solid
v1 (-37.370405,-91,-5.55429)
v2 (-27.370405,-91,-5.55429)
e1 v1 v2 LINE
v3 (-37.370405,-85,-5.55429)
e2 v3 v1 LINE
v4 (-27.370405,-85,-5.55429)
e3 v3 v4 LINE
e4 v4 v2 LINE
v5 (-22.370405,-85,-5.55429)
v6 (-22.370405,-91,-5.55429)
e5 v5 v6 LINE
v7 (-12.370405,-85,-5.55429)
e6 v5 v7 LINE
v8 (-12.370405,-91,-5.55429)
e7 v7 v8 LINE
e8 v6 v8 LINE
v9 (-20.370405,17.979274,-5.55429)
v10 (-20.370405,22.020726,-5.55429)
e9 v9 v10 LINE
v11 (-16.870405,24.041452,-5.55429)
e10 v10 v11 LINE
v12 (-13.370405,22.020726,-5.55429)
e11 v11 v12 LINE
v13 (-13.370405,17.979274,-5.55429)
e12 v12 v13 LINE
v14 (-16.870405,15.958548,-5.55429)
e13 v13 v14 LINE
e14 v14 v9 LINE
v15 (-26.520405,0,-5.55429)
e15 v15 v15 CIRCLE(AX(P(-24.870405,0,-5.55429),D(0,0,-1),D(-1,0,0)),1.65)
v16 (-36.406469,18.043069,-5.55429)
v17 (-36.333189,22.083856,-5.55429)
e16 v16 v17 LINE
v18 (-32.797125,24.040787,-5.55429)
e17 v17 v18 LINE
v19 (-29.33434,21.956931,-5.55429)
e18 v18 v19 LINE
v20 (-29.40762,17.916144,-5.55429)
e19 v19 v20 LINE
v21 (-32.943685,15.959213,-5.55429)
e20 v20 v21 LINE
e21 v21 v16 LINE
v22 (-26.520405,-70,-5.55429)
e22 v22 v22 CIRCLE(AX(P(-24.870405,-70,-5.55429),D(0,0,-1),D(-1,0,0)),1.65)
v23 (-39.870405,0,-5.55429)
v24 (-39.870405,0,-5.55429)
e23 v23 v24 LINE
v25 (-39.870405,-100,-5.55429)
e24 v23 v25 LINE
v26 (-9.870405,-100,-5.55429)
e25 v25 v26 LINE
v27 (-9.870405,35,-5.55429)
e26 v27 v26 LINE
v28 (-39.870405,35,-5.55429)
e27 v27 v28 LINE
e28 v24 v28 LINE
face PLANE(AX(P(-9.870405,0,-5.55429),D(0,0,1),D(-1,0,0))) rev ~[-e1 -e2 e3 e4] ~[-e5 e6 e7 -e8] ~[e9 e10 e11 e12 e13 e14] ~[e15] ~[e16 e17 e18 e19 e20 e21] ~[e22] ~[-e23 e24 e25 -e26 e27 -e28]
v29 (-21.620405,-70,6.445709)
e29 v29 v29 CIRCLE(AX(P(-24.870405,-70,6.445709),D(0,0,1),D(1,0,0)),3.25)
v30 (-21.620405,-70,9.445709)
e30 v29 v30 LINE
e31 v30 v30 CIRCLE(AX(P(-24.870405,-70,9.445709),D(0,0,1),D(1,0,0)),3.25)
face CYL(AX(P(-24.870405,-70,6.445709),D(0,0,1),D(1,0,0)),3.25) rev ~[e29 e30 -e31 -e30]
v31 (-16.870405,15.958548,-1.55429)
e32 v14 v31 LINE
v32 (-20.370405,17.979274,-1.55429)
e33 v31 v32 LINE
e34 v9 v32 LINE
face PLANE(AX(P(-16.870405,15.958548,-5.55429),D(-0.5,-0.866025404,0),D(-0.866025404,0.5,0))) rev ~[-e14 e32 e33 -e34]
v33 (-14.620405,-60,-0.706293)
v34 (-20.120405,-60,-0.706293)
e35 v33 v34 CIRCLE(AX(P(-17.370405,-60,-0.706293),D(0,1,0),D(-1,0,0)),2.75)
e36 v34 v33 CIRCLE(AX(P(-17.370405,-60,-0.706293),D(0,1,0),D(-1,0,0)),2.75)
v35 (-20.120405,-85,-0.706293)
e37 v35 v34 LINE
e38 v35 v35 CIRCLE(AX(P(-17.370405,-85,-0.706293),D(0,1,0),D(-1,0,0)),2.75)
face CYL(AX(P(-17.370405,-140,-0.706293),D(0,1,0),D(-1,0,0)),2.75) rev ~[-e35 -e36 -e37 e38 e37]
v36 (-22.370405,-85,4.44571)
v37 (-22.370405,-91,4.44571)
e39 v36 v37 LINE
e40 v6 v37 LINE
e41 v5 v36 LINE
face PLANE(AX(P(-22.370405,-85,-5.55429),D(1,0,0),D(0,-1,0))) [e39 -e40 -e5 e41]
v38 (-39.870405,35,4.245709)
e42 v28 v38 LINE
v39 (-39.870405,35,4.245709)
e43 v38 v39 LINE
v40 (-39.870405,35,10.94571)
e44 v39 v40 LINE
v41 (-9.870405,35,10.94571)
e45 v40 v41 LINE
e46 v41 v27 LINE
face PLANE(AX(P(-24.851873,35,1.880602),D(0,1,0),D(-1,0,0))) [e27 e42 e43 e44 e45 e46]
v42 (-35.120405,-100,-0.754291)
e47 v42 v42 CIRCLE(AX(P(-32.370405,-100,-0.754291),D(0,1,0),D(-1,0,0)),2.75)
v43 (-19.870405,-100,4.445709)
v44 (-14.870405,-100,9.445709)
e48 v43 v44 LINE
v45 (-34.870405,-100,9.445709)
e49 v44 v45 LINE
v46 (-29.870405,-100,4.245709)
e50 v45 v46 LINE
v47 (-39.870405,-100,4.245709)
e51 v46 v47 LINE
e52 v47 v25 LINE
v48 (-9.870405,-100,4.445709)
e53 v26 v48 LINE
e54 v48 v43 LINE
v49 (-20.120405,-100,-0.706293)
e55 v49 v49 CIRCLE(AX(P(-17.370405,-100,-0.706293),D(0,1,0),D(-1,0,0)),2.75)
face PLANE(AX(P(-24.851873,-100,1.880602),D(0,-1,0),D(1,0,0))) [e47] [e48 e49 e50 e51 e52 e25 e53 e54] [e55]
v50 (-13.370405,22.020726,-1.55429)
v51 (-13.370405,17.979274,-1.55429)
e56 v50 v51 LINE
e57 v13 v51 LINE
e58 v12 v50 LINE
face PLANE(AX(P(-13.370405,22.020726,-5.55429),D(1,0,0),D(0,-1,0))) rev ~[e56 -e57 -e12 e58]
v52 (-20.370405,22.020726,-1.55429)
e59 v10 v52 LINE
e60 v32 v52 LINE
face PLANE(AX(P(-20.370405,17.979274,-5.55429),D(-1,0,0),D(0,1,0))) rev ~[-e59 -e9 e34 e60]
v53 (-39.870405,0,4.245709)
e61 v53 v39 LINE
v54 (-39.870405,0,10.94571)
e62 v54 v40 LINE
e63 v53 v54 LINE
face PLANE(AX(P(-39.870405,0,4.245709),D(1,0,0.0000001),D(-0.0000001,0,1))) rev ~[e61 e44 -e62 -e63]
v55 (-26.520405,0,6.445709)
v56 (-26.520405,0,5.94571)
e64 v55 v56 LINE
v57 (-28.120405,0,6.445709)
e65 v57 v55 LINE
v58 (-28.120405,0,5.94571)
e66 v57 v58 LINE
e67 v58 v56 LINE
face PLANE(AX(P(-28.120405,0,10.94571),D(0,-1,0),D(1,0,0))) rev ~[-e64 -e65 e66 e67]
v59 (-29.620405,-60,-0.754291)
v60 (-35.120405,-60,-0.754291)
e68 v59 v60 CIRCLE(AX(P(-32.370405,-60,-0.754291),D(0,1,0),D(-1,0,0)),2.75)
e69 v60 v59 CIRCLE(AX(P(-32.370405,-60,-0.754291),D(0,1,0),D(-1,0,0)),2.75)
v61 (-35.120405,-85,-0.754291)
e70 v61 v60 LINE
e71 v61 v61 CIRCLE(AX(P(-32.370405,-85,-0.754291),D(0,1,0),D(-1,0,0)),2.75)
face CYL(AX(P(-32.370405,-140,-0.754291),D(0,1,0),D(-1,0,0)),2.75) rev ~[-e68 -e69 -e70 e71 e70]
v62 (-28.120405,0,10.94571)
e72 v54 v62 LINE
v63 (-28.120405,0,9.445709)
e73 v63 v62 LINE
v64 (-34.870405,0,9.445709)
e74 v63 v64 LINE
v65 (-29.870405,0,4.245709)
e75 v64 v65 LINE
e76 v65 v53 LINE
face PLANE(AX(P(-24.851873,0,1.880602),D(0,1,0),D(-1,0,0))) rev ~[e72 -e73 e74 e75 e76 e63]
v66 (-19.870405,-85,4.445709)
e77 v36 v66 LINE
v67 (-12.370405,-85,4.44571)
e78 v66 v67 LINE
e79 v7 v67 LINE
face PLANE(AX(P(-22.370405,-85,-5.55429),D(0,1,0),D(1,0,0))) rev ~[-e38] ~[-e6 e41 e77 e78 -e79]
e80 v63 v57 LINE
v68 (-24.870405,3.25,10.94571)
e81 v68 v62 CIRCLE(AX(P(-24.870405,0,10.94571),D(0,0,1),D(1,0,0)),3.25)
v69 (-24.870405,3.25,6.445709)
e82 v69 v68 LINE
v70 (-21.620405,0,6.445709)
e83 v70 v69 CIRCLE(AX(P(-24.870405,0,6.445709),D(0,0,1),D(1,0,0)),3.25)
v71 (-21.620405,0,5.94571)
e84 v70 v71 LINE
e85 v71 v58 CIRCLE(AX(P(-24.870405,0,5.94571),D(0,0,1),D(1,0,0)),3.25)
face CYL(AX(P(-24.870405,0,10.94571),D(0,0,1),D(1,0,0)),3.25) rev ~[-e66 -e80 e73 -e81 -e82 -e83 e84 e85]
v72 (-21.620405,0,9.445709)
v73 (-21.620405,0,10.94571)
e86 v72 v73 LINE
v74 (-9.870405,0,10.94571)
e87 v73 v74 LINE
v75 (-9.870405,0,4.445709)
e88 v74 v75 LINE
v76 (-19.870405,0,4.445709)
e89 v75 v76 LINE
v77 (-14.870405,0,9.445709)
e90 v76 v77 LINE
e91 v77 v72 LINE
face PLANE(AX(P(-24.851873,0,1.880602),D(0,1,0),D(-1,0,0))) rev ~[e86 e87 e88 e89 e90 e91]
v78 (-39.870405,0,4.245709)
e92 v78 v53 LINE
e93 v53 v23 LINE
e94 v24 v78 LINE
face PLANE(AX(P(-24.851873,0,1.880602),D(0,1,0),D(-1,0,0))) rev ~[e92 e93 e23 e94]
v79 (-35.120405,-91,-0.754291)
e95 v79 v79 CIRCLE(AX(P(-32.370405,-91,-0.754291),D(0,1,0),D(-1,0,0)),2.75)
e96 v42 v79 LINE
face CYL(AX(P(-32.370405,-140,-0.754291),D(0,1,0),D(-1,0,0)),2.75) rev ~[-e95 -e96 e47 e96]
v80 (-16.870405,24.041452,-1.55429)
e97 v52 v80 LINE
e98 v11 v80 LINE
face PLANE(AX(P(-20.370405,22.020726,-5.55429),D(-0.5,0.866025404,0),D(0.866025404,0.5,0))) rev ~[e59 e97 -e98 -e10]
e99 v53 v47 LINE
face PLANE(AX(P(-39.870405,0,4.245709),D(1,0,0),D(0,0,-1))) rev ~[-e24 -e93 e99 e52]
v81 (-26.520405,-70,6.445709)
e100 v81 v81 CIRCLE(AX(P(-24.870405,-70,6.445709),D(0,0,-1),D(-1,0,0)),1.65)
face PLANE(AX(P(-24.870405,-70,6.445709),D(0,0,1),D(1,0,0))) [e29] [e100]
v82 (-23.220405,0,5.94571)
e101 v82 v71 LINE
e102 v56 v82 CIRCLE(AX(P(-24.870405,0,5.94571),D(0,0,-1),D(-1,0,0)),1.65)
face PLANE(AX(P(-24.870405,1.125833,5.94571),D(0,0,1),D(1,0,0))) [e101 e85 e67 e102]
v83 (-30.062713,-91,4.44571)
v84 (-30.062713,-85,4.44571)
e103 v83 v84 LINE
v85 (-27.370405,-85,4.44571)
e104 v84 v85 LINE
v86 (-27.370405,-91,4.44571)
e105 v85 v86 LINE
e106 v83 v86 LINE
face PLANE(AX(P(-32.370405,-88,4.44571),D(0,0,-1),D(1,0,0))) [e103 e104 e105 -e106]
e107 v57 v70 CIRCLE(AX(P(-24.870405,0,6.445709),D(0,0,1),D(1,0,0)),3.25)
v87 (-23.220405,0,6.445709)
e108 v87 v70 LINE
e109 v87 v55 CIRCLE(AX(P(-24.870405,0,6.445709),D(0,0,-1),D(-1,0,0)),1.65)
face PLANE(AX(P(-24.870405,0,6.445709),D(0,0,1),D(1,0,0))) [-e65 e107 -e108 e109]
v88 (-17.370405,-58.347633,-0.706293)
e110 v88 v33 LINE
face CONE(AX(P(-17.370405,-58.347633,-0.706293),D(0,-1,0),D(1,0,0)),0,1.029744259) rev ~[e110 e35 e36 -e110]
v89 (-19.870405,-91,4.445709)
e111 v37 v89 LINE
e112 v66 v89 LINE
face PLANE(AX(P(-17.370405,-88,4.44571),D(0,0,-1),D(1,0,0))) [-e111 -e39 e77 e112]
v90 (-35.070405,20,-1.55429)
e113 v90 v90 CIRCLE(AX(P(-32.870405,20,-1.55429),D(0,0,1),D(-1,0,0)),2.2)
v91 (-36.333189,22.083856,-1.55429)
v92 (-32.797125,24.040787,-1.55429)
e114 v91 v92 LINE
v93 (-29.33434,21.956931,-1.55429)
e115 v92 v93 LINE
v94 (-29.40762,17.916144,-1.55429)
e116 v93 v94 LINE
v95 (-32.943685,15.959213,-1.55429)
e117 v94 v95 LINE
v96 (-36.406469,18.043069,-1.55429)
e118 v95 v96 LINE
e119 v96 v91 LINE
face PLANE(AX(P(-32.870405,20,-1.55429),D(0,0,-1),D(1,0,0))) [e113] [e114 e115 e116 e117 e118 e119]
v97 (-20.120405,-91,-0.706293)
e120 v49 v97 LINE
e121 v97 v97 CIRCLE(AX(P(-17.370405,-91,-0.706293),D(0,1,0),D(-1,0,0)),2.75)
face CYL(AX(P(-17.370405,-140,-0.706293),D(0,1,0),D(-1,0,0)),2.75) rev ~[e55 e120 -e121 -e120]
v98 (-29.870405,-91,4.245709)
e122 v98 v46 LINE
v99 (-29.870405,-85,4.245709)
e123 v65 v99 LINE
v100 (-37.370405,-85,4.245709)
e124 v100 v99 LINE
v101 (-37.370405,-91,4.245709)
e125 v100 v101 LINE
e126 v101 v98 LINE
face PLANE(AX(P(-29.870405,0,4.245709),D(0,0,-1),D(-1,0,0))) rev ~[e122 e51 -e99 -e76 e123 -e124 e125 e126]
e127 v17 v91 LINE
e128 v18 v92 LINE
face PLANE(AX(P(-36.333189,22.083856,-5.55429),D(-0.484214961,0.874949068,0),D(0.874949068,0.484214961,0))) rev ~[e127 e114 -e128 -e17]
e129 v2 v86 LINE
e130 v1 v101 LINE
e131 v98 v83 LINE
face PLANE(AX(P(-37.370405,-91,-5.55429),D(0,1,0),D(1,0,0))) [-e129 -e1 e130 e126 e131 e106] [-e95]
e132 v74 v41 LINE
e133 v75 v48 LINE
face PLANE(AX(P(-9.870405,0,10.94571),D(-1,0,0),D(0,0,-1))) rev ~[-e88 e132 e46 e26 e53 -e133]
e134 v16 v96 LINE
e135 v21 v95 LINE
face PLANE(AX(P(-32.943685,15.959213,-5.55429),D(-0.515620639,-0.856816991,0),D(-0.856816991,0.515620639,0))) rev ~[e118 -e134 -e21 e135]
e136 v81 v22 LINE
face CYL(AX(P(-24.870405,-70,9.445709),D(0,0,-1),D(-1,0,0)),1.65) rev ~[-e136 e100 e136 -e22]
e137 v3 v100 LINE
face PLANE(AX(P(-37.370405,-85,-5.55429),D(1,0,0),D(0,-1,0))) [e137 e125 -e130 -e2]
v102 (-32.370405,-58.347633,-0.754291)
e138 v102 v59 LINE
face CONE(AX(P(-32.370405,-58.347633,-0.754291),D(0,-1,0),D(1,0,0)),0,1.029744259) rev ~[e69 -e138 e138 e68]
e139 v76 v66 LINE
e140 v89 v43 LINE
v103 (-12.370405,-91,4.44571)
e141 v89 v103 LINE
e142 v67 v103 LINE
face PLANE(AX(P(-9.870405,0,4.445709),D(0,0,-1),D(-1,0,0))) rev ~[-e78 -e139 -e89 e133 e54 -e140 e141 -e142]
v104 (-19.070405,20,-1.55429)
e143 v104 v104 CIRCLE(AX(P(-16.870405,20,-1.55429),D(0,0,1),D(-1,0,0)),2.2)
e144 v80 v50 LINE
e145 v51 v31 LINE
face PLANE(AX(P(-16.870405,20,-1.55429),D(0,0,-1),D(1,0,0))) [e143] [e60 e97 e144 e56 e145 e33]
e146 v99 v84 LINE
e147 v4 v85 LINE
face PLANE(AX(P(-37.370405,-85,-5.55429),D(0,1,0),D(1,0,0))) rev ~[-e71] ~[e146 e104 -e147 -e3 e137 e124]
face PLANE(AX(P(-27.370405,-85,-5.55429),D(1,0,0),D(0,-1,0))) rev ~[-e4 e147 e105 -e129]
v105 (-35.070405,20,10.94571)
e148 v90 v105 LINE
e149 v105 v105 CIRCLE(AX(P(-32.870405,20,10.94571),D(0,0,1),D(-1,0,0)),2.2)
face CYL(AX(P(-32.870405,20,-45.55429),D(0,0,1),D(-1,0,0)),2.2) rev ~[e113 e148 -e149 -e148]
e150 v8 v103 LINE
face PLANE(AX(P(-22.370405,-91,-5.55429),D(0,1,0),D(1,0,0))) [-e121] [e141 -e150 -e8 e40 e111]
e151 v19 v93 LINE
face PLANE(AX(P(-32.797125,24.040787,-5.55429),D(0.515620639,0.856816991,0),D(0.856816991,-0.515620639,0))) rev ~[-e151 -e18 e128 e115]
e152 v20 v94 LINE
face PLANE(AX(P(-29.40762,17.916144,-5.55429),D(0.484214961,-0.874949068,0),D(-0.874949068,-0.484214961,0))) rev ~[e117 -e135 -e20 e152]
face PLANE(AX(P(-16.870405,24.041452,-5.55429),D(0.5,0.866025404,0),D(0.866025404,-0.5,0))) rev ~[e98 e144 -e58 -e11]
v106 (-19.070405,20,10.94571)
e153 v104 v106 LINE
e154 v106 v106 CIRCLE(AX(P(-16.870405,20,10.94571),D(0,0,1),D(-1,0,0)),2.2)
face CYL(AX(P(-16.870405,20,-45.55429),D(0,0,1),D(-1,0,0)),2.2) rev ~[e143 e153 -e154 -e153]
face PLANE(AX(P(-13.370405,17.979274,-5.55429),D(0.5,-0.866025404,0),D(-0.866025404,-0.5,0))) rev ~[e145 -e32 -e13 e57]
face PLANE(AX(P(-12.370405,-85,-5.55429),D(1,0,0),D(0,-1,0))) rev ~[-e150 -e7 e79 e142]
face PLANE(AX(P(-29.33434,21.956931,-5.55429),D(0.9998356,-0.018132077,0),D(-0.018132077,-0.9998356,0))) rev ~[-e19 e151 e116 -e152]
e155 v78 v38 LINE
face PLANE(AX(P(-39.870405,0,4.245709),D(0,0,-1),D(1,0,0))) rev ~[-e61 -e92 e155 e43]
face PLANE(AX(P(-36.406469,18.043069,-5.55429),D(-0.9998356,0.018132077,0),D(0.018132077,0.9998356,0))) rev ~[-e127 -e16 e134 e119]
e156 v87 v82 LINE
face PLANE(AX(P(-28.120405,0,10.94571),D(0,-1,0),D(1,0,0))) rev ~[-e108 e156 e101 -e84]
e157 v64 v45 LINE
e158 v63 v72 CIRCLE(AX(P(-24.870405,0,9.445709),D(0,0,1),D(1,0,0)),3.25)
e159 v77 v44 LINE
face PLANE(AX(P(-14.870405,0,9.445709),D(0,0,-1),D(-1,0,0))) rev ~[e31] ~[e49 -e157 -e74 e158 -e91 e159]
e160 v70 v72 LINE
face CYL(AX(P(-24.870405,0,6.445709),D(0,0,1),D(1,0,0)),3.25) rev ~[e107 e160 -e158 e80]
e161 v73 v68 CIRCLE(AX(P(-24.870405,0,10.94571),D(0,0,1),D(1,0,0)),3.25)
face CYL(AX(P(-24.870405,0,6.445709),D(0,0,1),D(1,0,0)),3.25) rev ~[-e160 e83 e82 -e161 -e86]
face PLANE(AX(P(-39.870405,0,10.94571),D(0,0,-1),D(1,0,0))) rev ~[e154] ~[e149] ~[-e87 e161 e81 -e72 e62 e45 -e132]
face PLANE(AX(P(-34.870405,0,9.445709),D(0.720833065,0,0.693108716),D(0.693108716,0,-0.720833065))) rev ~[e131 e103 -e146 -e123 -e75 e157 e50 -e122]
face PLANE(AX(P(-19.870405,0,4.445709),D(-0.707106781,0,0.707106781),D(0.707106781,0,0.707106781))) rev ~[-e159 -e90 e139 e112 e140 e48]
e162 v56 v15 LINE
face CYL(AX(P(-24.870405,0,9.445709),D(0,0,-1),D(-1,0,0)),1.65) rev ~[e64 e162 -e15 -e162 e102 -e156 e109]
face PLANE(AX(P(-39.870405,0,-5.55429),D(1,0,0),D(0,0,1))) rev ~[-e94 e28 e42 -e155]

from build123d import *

# Parameters (mm, degrees)
F0_R            = 2.5000000706
F0_R_2          = 2.5000000298
F1_DEPTH        = 100
F3_DEPTH        = 35
F6_D            = 4.4
F6_DEPTH        = 40
F6_TIP          = 1.3218933619
F5_W            = 10
F5_H            = 6
F7_DEPTH        = 10
F9_D            = 5.5
F9_DEPTH        = 40
F9_TIP          = 1.6523667023
F10_DEPTH       = 4
F12_D           = 3.3
F12_CBORE_D     = 6.5
F12_CBORE_DEPTH = 3
F14_DEPTH       = 5


# Not quite as in the source:
# - ends of sketch curves that miss each other by under 0.0002 mm in the source are joined
# - a feature names something its author has since deleted; it is built from what else it names


with BuildPart() as f1:
    # F0 (on Front) → F1 (new body)
    with BuildSketch(Plane.XZ):
        Polygon((-39.8704047501, 4.2457092745), (-39.8704047501, -5.5542903855), (-9.8704054207, -5.5542903855), (-9.8704054207, 4.4457092745), (-19.8704054207, 4.4457092745), (-14.8704054207, 9.4457092745), (-24.8704050854, 9.4457092745), (-34.8704047501, 9.4457092745), (-29.8704047501, 4.2457092745), align=None)
        with Locations((-32.3704050442, -0.7542907016)):
            Circle(F0_R, mode=Mode.SUBTRACT)
        with Locations((-17.3704050202, -0.7062930843)):
            Circle(F0_R_2, mode=Mode.SUBTRACT)
        with Locations((-32.3704050442, -0.7542907016)):
            Circle(F0_R)
        with Locations((-17.3704050202, -0.7062930843)):
            Circle(F0_R_2)
    extrude(amount=F1_DEPTH)

    # F2 (on face) → F3 (join)
    with BuildSketch(Plane(origin=(0, 0, 0), x_dir=(-1, 0, 0), z_dir=(0, 1, 0))):
        Polygon((9.8704054207, 4.4457092745), (9.8704054207, -5.5542903855), (39.8704054207, -5.5542903855), (39.8704054207, 4.2457092745), (29.8704047501, 4.2457092745), (34.8704047501, 9.4457092745), (14.8704054207, 9.4457092745), (19.8704054207, 4.4457092745), align=None)
        Polygon((9.8704054207, 10.9457096145), (9.8704054207, 4.4457092745), (19.8704054207, 4.4457092745), (14.8704054207, 9.4457092745), (34.8704047501, 9.4457092745), (29.8704047501, 4.2457092745), (39.8704047501, 4.2457092745), (39.8704054207, 10.9457096145), align=None)
    extrude(amount=F3_DEPTH)

    # F4: union 

    # F6
    with Locations(Plane(origin=(0, 0, -5.5542903855), x_dir=(1, 0, 0), z_dir=(0, 0, -1))):
        with Locations((-16.8704054207, -20), (-32.8704047501, -20)):
            Hole(F6_D / 2, depth=F6_DEPTH)
            with Locations((0, 0, -(F6_DEPTH + F6_TIP / 2))):  # 118° drill point
                Cone(0, F6_D / 2, F6_TIP, mode=Mode.SUBTRACT)

    # F5 (on face) → F7 (cut)
    with BuildSketch(Plane(origin=(0, 0, -5.5542903855), x_dir=(1, 0, 0), z_dir=(0, 0, -1))):
        with Locations((-17.3704054207, 88)):
            Rectangle(F5_W, F5_H)
        with Locations((-32.3704047501, 88)):
            Rectangle(F5_W, F5_H)
    extrude(amount=-F7_DEPTH, mode=Mode.SUBTRACT)

    # F9
    with Locations(Plane.XZ.offset(100)):
        with Locations((-32.3704050442, -0.7542907016), (-17.3704050202, -0.7062930843)):
            Hole(F9_D / 2, depth=F9_DEPTH)
            with Locations((0, 0, -(F9_DEPTH + F9_TIP / 2))):  # 118° drill point
                Cone(0, F9_D / 2, F9_TIP, mode=Mode.SUBTRACT)

    # F5 (on face) → F10 (cut)
    with BuildSketch(Plane(origin=(0, 0, -5.5542903855), x_dir=(1, 0, 0), z_dir=(0, 0, -1))):
        Polygon((-20.3704054207, -17.9792740578), (-20.3704054207, -22.0207259422), (-16.8704054207, -24.0414518843), (-13.3704054207, -22.0207259422), (-13.3704054207, -17.9792740578), (-16.8704054207, -15.9585481157), align=None)
        Polygon((-32.7971248335, -24.0407874712), (-29.3343401905, -21.9569314662), (-29.4076201071, -17.9161439951), (-32.9436846667, -15.9592125288), (-36.4064693097, -18.0430685338), (-36.3331893931, -22.0838560049), align=None)
    extrude(amount=-F10_DEPTH, mode=Mode.SUBTRACT)

    # F12 (through all)
    with Locations(Plane.XY.offset(9.4457092745)):
        with Locations((-24.8704050854, 0), (-24.8704050854, -70)):
            CounterBoreHole(F12_D / 2, F12_CBORE_D / 2, F12_CBORE_DEPTH)

    # F13 (on face) → F14 (cut)
    with BuildSketch(Plane.XY.offset(10.9457096145)):
        with BuildLine():
            Line((-28.1204054207, 0), (-21.6204054207, 0))
            ThreePointArc((-21.6204054207, 0), (-24.8704054207, 3.25), (-28.1204054207, 0))
        make_face()
    extrude(amount=-F14_DEPTH, mode=Mode.SUBTRACT)


solid = f1.part
